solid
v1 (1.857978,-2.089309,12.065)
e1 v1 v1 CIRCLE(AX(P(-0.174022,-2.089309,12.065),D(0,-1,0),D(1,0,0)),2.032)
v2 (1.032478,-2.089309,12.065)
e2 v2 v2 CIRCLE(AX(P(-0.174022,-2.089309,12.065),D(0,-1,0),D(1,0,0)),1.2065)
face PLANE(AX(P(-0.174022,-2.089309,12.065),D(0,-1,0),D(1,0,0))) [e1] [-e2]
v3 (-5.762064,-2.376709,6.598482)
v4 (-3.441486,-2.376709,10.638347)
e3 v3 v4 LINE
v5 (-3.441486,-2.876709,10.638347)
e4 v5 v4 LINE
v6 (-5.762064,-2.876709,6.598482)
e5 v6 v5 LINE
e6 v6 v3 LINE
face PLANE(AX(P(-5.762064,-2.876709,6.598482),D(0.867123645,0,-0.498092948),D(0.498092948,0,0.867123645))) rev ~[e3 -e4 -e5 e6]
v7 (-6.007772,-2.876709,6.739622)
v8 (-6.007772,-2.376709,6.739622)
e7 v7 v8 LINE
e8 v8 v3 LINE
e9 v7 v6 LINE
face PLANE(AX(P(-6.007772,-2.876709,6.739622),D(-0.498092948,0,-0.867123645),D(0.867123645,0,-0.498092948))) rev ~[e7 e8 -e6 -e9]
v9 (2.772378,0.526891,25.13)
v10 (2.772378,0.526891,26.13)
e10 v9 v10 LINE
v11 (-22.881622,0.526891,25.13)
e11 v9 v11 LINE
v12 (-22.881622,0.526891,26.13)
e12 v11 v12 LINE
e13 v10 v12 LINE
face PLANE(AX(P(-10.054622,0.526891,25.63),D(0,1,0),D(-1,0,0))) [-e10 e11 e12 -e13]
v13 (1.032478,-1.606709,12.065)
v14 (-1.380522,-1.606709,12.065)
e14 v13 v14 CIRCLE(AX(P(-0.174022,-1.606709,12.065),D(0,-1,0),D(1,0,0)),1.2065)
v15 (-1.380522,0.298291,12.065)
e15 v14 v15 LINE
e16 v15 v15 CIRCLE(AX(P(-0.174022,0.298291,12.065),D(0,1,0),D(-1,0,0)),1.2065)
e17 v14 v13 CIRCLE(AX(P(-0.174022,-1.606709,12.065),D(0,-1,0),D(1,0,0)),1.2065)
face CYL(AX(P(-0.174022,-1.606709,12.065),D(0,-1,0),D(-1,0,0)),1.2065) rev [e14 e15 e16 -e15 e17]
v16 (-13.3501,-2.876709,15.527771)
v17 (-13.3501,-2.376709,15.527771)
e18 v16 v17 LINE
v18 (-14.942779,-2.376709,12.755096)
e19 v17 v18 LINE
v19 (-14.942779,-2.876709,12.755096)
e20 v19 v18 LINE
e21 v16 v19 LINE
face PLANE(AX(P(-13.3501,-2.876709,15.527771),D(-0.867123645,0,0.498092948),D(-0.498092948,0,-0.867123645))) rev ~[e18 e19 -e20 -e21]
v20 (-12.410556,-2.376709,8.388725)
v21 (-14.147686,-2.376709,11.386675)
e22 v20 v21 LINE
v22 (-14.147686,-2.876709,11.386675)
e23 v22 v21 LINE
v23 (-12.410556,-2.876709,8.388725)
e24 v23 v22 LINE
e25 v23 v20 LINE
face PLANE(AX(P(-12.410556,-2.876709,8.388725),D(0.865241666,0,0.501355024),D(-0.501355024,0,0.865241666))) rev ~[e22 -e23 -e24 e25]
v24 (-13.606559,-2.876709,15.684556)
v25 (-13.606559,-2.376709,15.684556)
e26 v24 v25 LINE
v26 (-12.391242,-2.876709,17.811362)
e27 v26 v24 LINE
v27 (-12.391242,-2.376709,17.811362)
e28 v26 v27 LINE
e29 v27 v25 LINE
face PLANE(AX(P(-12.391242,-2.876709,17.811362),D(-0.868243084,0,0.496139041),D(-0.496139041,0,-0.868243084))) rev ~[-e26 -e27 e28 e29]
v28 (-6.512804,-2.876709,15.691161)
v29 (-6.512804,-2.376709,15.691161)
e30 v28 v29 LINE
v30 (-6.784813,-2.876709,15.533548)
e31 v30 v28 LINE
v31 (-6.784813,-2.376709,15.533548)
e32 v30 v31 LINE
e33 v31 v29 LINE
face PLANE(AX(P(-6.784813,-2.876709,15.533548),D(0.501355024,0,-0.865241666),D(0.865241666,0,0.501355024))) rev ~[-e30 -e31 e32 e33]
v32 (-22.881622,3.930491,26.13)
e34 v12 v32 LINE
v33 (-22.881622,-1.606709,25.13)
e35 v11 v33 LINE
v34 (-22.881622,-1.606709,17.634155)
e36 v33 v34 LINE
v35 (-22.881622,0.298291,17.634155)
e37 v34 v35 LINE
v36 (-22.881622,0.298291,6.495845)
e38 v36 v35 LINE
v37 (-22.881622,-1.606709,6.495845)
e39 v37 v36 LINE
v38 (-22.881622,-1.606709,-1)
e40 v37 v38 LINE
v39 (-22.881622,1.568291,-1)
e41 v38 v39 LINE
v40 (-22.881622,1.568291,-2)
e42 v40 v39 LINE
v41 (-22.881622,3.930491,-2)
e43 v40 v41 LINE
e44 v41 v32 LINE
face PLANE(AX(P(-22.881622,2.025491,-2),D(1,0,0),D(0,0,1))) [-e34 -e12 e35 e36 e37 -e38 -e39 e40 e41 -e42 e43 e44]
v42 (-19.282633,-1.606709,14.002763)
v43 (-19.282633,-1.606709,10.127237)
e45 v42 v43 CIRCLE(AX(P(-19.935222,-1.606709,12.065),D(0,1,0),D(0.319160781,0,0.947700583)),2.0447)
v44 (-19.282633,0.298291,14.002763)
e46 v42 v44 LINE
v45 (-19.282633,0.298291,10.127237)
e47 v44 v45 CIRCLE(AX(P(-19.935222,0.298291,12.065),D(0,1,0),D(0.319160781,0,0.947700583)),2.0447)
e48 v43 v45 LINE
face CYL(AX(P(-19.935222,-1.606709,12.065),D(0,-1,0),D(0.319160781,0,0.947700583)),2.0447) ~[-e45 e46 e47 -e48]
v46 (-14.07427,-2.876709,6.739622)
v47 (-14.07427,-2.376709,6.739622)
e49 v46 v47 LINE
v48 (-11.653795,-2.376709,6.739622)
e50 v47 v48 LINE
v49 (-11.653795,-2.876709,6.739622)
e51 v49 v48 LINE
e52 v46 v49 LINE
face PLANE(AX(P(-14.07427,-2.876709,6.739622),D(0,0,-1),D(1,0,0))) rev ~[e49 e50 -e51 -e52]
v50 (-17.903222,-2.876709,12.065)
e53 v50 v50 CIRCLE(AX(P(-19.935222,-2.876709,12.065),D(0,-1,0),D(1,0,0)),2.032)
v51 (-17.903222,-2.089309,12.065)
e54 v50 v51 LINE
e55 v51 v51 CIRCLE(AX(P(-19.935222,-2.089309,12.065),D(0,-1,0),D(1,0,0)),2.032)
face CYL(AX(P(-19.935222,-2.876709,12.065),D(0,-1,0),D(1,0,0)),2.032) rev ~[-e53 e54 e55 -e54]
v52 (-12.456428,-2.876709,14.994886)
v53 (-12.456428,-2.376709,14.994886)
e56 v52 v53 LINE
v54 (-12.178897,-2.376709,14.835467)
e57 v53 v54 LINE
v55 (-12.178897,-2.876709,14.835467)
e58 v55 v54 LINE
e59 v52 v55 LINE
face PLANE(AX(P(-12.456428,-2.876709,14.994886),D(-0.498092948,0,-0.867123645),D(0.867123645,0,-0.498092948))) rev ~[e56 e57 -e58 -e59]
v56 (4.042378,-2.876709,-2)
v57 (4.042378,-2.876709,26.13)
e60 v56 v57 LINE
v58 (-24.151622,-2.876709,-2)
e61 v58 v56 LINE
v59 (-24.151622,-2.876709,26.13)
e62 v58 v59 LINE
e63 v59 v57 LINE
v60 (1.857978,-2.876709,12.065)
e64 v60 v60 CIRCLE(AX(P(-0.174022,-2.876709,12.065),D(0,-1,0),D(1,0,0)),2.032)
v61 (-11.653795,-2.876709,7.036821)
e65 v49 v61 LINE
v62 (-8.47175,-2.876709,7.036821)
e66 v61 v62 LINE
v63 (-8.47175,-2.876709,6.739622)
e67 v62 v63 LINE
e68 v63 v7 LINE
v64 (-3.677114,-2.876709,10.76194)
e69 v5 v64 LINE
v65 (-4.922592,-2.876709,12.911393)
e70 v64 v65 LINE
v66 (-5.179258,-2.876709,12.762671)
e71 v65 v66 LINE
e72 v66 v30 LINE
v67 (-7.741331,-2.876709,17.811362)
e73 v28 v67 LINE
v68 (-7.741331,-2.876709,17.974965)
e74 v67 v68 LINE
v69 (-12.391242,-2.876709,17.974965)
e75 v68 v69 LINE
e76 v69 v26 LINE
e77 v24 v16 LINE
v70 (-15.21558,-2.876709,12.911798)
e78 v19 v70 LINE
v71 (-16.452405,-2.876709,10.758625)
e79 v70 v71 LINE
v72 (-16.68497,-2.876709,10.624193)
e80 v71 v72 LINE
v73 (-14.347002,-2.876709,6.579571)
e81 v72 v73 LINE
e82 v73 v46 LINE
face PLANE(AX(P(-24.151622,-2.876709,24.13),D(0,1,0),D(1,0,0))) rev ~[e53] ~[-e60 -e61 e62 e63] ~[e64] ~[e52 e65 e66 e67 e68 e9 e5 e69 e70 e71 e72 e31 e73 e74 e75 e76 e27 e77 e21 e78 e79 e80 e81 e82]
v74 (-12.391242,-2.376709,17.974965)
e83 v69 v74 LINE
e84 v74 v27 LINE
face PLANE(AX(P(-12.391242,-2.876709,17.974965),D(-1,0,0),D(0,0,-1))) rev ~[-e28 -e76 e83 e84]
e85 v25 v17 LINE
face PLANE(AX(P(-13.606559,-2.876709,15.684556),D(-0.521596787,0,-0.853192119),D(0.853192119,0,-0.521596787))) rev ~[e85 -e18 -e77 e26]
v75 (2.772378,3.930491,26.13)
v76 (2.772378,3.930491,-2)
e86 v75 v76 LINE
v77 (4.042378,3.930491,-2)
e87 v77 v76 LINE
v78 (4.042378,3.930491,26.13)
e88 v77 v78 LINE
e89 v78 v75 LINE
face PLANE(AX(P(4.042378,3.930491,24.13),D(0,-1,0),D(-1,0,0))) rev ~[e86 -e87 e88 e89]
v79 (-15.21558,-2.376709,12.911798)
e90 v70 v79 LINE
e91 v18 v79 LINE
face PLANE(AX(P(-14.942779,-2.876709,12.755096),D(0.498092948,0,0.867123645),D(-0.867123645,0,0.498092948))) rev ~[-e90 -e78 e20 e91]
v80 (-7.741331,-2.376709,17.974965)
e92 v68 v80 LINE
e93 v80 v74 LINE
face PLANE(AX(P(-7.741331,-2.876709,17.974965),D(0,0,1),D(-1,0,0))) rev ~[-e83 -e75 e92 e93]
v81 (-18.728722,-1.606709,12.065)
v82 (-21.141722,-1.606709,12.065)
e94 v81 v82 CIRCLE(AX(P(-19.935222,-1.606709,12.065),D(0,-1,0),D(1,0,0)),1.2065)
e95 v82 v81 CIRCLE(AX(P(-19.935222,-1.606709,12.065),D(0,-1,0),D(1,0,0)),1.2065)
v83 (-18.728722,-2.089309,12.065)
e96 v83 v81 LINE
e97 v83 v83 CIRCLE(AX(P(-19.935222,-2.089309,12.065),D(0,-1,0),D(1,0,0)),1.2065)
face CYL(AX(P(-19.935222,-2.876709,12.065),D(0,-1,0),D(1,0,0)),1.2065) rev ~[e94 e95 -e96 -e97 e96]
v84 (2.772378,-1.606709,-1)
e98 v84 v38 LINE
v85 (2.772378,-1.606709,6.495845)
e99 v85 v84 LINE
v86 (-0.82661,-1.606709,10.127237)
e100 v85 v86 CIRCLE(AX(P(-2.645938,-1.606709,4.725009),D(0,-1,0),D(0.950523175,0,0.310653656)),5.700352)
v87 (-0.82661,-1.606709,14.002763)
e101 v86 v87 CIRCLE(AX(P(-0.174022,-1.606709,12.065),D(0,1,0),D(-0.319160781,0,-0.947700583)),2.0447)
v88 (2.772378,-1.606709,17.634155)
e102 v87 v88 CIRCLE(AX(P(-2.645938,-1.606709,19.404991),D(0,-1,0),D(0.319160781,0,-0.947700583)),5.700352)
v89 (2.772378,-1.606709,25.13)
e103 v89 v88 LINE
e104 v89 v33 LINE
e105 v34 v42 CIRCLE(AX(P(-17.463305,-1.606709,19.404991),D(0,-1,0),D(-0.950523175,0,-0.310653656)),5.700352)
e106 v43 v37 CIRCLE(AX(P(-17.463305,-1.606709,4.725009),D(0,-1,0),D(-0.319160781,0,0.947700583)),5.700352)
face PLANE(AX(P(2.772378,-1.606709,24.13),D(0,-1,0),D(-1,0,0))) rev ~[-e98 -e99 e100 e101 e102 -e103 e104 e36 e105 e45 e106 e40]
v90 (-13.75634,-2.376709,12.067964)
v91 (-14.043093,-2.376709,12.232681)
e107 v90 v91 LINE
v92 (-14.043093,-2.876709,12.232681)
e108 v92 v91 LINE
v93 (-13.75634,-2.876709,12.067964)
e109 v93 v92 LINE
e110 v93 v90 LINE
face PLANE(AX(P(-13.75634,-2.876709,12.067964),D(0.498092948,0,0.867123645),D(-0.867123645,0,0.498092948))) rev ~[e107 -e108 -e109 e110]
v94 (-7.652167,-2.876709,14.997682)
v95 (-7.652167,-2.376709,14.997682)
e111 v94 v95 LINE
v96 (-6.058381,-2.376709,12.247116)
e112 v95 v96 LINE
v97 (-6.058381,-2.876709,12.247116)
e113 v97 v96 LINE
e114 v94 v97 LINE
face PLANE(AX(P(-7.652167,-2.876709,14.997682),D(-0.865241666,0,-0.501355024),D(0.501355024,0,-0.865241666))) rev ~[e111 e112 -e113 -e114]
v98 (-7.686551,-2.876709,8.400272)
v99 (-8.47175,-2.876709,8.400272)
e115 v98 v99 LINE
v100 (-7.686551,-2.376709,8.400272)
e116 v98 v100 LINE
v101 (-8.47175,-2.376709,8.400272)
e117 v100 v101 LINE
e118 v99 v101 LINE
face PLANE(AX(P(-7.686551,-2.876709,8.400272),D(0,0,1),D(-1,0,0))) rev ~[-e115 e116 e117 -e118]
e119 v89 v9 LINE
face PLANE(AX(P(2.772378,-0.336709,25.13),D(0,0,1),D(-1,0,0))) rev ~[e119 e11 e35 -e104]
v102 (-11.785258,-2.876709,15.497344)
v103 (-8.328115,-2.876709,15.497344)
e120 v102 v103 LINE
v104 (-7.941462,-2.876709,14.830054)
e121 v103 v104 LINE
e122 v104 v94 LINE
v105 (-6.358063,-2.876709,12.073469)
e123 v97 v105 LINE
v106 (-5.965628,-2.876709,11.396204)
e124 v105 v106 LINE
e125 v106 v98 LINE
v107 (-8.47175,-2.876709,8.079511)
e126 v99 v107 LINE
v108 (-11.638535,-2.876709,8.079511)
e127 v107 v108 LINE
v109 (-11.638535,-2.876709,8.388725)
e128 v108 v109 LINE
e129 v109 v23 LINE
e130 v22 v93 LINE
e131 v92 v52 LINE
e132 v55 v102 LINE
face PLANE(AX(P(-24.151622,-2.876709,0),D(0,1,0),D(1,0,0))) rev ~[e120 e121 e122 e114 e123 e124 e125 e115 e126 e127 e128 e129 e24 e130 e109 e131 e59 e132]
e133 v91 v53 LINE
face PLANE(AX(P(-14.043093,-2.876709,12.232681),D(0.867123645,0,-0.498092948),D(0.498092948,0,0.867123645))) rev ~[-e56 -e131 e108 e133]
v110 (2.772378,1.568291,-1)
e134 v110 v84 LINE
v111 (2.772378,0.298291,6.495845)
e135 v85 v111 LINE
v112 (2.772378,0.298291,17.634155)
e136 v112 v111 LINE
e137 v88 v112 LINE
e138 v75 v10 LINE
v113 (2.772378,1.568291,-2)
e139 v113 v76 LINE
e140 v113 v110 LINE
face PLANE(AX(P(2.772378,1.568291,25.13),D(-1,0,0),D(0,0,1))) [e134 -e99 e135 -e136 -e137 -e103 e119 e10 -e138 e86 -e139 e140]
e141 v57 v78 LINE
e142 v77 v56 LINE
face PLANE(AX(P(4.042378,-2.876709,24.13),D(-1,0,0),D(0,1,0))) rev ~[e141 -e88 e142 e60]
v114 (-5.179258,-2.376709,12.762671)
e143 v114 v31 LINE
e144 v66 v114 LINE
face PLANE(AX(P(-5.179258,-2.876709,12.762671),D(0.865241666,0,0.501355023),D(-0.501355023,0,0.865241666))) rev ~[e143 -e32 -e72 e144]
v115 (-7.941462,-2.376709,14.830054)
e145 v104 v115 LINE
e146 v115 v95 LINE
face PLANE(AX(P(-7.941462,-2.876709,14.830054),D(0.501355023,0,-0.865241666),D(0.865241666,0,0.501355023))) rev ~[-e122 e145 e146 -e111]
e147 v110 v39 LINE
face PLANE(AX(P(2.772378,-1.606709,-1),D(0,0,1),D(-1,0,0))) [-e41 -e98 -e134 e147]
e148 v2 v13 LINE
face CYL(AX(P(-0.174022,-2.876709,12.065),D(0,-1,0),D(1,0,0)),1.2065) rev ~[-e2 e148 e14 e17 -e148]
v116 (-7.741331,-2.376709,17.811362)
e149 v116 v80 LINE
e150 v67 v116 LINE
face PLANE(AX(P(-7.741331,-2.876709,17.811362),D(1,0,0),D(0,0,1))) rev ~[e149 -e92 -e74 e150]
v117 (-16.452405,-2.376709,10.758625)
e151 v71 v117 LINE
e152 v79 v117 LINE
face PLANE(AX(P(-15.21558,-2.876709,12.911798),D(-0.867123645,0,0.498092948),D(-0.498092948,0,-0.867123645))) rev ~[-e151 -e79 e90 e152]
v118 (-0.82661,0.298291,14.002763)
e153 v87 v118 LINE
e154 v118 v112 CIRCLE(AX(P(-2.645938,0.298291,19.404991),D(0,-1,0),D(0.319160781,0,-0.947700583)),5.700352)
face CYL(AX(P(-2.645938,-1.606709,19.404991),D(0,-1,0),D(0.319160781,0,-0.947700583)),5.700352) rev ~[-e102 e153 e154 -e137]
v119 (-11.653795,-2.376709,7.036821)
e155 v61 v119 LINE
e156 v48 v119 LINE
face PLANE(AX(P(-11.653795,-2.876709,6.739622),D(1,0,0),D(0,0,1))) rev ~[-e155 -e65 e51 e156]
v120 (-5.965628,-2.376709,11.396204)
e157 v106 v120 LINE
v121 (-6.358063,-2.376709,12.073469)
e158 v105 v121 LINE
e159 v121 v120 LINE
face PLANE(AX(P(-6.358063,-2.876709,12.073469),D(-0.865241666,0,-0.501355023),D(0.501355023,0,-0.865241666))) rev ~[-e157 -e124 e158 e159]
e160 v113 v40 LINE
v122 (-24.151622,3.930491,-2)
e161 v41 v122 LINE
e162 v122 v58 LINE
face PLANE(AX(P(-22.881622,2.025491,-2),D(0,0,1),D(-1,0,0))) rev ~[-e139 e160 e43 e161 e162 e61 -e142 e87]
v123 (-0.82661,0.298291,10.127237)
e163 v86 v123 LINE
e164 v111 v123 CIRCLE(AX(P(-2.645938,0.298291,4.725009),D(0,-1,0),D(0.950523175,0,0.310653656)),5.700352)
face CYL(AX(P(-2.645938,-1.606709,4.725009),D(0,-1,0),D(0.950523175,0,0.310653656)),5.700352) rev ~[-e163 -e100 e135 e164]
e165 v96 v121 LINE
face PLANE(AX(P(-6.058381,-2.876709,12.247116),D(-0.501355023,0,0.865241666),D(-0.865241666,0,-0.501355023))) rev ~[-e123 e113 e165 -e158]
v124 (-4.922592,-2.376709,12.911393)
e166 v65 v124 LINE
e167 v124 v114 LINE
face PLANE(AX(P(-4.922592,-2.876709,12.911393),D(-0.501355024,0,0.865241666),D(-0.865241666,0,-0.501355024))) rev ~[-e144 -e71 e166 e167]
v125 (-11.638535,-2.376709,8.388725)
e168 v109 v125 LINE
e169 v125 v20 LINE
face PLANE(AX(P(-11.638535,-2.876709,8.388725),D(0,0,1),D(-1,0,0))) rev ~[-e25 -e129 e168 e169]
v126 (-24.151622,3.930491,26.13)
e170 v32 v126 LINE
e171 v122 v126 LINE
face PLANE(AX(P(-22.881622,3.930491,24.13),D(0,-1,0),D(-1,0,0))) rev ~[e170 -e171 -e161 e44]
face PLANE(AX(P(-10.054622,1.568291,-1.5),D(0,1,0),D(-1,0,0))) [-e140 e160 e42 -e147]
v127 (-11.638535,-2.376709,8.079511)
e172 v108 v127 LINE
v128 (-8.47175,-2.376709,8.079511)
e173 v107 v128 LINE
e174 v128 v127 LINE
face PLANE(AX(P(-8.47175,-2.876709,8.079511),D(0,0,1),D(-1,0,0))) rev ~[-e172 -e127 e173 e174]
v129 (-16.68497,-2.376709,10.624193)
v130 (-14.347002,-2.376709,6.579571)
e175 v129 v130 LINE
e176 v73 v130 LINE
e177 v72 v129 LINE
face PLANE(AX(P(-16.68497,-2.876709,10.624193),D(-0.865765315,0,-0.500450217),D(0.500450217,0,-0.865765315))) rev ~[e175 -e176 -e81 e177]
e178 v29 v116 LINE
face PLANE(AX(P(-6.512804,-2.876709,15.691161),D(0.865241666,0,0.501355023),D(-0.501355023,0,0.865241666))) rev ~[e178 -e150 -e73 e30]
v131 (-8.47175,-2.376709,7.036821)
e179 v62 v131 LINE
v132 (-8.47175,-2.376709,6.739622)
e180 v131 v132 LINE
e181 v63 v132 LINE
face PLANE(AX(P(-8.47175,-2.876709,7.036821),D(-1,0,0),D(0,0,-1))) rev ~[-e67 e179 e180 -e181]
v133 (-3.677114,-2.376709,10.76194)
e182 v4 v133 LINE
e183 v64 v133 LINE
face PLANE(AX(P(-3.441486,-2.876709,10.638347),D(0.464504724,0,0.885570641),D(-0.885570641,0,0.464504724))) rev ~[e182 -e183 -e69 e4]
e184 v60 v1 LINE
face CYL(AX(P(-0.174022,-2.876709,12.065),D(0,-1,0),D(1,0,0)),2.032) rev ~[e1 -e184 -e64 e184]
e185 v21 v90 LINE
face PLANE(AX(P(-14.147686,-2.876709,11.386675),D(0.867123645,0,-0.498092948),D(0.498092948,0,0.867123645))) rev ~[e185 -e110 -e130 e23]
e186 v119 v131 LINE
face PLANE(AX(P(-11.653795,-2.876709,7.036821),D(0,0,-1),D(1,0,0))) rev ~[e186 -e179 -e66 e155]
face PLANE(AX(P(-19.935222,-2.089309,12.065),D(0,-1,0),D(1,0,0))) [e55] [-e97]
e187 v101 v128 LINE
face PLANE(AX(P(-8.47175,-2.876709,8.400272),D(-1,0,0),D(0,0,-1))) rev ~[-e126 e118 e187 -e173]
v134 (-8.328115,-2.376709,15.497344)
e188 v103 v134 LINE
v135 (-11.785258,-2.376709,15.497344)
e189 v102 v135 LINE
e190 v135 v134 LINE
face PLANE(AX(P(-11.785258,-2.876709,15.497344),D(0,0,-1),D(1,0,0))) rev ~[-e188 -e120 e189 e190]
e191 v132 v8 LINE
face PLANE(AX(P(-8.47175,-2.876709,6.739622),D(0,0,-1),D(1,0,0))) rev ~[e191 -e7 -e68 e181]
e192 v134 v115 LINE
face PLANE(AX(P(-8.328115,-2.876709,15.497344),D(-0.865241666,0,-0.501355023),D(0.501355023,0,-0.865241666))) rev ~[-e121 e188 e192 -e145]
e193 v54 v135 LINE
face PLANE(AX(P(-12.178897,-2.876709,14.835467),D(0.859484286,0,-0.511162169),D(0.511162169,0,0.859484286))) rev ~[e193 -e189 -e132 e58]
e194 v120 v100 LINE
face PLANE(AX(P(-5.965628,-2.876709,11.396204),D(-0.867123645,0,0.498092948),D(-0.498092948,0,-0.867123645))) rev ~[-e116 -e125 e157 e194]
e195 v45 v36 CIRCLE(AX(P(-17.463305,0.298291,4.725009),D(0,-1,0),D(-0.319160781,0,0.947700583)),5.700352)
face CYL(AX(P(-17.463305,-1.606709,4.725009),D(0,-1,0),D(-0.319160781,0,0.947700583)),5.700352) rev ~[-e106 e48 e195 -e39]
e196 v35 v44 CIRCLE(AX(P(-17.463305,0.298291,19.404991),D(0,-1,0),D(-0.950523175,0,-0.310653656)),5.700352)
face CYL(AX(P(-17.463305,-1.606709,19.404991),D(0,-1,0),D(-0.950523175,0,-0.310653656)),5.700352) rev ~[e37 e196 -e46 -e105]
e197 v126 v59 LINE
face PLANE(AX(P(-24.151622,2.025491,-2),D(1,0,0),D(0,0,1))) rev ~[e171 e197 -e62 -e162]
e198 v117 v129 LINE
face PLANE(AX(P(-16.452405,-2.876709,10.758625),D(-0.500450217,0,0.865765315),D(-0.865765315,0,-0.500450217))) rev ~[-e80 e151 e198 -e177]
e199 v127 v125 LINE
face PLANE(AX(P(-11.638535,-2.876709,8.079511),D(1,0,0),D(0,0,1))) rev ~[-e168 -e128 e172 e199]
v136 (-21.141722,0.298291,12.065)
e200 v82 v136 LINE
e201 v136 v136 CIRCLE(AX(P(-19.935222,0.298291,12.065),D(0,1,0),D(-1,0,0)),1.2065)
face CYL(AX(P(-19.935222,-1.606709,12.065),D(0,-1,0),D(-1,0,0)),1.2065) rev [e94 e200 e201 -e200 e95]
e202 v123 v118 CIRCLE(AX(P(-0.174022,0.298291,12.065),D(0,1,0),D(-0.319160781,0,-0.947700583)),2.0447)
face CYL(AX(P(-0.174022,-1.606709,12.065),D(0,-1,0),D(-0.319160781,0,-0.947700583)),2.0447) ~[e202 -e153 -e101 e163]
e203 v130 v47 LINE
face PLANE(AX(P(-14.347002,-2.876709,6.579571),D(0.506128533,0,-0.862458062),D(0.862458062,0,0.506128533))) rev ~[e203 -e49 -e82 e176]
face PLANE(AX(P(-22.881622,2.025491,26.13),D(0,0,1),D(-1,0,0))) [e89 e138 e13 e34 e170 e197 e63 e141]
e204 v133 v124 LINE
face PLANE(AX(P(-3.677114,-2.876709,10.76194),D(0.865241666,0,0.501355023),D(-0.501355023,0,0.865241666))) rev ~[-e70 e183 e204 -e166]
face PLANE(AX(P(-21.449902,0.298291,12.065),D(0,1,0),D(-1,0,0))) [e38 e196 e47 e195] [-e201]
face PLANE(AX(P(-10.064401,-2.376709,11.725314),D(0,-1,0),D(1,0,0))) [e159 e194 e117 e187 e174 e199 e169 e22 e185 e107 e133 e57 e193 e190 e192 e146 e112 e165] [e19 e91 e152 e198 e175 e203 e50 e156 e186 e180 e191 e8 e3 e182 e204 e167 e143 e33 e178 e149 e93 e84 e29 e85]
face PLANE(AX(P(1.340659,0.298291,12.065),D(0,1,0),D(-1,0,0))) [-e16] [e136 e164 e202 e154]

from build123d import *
from build123d import SkipClean  # not in build123d's __all__

# Parameters (mm, degrees)
F1_DEPTH  = 24.13
F2_R      = 2.032
F2_R_2    = 1.2065
F3_DEPTH  = 0.7874
F4_DEPTH  = 25.4
F6_DEPTH  = 0.5
F7_DEPTH  = 2
F8_DEPTH  = 2
F9_W      = 25.654
F9_H      = 1
F10_DEPTH = 1.27
F11_R     = 1.2065
F12_DEPTH = 1.905
F13_DEPTH = 1.905
F14_DEPTH = 1.0414


# Not quite as in the source:
# - after a boolean that leaves OpenCascade's solid faulty, fix() repairs it
# - a feature names something its author has since deleted; it is built from what else it names


with BuildPart() as f1:
    # F0 (on Top) → F1 (new body)
    with BuildSketch(Plane.XY):
        Polygon((-22.881621525, -1.6067087497), (-22.881621525, 2.0254912503), (-24.151621525, 2.0254912503), (-24.151621525, -2.8767087497), (4.042378475, -2.8767087497), (4.042378475, 2.0254912503), (2.772378475, 2.0254912503), (2.772378475, -1.6067087497), align=None)
    extrude(amount=F1_DEPTH)

    # F2 (on face) → F3 (cut)
    with BuildSketch(Plane.XZ.offset(2.8767087497)):
        with Locations((-19.935221525, 12.065)):
            Circle(F2_R)
        with Locations((-19.935221525, 12.065)):
            Circle(F2_R_2, mode=Mode.SUBTRACT)
        with Locations((-0.174021525, 12.065)):
            Circle(F2_R)
        with Locations((-0.174021525, 12.065)):
            Circle(F2_R_2, mode=Mode.SUBTRACT)
    extrude(amount=-F3_DEPTH, mode=Mode.SUBTRACT)

    # F4 (cut): faces of the model
    f4_faces = [f1.faces().sort_by_distance(p)[0] for p in [
        (-19.935221525, -2.8767087497, 12.065),
        (-0.174021525, -2.8767087497, 12.065),
    ]]
    extrude(f4_faces, amount=-F4_DEPTH, mode=Mode.SUBTRACT)

    # F5 (on face) → F6 (cut)
    with BuildSketch(Plane.XZ.offset(2.8767087497)):
        Polygon((-12.3912415756, 17.8113617003), (-13.6065593278, 15.684556216), (-13.3501001609, 15.5277705701), (-14.9427792273, 12.7550959473), (-15.21558023, 12.9117982314), (-16.4524054843, 10.7586249602), (-16.6849697297, 10.6241926551), (-14.3470017528, 6.5795714036), (-14.0742704561, 6.7396221901), (-11.6537952153, 6.7396221901), (-11.6537952153, 7.0368205197), (-8.471750264, 7.0368205197), (-8.471750264, 6.7396221901), (-6.0077723583, 6.7396221901), (-5.7620638571, 6.5984823741), (-3.4414858846, 10.6383468956), (-3.6771140247, 10.7619399543), (-4.9225916905, 12.9113931759), (-5.1792576933, 12.7626708074), (-6.7848130465, 15.533548376), (-6.5128039159, 15.6911611557), (-7.7413314311, 17.8113617003), (-7.7413314311, 17.9749652743), (-12.3912415756, 17.9749652743), align=None)
        Polygon((-12.1788967651, 14.8354667667), (-11.7852579159, 15.4973436147), (-8.3281154101, 15.4973436147), (-7.9414616069, 14.830054039), (-7.6521674377, 14.9976824493), (-6.0583813106, 12.2471162856), (-6.3580625964, 12.0734691718), (-5.9656283895, 11.396203739), (-7.6865507823, 8.4002719491), (-8.471750264, 8.4002719491), (-8.471750264, 8.0795111135), (-11.6385354949, 8.0795111135), (-11.6385354949, 8.3887251094), (-12.4105562744, 8.3887251094), (-14.1476861274, 11.3866747806), (-13.7563398992, 12.0679644255), (-14.0430930461, 12.2326810967), (-12.4564279131, 14.9948861397), align=None, mode=Mode.SUBTRACT)
    extrude(amount=-F6_DEPTH, mode=Mode.SUBTRACT)

    # F7 (add): a face of the model
    f7_faces = [f1.faces().sort_by_distance(p)[0] for p in [
        (-10.054621525, -1.7395492941, 0),
    ]]
    extrude(f7_faces, amount=F7_DEPTH)

    # F8 (add): a face of the model
    f8_faces = [f1.faces().sort_by_distance(p)[0] for p in [
        (-10.054621525, -1.7395492941, 24.13),
    ]]
    extrude(f8_faces, amount=F8_DEPTH)

    # F9 (on face) → F10 (join)
    with BuildSketch(Plane(origin=(0, -1.6067087497, 0), x_dir=(-1, 0, 0), z_dir=(0, 1, 0))):
        with Locations((10.054621525, 25.63)):
            Rectangle(F9_W, F9_H)
        with Locations((10.054621525, -1.5)):
            Rectangle(F9_W, F9_H)
    extrude(amount=F10_DEPTH)

    # F11 (on face) → F12 (join)
    with BuildSketch(Plane(origin=(0, -1.6067087497, 0), x_dir=(-1, 0, 0), z_dir=(0, 1, 0))):
        with BuildLine():
            ThreePointArc((-2.772378475, 6.4958446701), (-1.4028429606, 8.7376625106), (0.8266095876, 10.1272365784))
            ThreePointArc((0.8266095876, 10.1272365784), (2.218721566, 12.065), (0.8266095876, 14.0027634216))
            ThreePointArc((0.8266095876, 14.0027634216), (-1.4028429606, 15.3923374894), (-2.772378475, 17.6341553299))
            Line((-2.772378475, 17.6341553299), (-2.772378475, 6.4958446701))
        make_face()
        with Locations((0.174021525, 12.065)):
            Circle(F11_R, mode=Mode.SUBTRACT)
        with BuildLine():
            ThreePointArc((19.2826334624, 10.1272365784), (21.5120860106, 8.7376625106), (22.881621525, 6.4958446701))
            Line((22.881621525, 6.4958446701), (22.881621525, 17.6341553299))
            ThreePointArc((22.881621525, 17.6341553299), (21.5120860106, 15.3923374894), (19.2826334624, 14.0027634216))
            ThreePointArc((19.2826334624, 14.0027634216), (17.890521484, 12.065), (19.2826334624, 10.1272365784))
        make_face()
        with Locations((19.935221525, 12.065)):
            Circle(F11_R, mode=Mode.SUBTRACT)
    with SkipClean():  # cleaning this boolean's faces spoils the solid; the shape is the same uncleaned
        extrude(amount=F12_DEPTH)

    # F13 (add): faces of the model
    f13_faces = [f1.faces().sort_by_distance(p)[0] for p in [
        (-23.516621525, 2.0254912503, 12.065),
        (-10.054621525, -0.3367087497, 25.63),
        (-10.054621525, -0.3367087497, -1.5),
        (3.407378475, 2.0254912503, 12.065),
    ]]
    extrude(f13_faces, amount=F13_DEPTH)

    add(f1.part.fix(), mode=Mode.REPLACE)

    # F14 (cut): a face of the model
    f14_faces = [f1.faces().sort_by_distance(p)[0] for p in [
        (-10.054621525, 1.5682912503, 25.63),
    ]]
    extrude(f14_faces, amount=-F14_DEPTH, mode=Mode.SUBTRACT)


solid = f1.part
